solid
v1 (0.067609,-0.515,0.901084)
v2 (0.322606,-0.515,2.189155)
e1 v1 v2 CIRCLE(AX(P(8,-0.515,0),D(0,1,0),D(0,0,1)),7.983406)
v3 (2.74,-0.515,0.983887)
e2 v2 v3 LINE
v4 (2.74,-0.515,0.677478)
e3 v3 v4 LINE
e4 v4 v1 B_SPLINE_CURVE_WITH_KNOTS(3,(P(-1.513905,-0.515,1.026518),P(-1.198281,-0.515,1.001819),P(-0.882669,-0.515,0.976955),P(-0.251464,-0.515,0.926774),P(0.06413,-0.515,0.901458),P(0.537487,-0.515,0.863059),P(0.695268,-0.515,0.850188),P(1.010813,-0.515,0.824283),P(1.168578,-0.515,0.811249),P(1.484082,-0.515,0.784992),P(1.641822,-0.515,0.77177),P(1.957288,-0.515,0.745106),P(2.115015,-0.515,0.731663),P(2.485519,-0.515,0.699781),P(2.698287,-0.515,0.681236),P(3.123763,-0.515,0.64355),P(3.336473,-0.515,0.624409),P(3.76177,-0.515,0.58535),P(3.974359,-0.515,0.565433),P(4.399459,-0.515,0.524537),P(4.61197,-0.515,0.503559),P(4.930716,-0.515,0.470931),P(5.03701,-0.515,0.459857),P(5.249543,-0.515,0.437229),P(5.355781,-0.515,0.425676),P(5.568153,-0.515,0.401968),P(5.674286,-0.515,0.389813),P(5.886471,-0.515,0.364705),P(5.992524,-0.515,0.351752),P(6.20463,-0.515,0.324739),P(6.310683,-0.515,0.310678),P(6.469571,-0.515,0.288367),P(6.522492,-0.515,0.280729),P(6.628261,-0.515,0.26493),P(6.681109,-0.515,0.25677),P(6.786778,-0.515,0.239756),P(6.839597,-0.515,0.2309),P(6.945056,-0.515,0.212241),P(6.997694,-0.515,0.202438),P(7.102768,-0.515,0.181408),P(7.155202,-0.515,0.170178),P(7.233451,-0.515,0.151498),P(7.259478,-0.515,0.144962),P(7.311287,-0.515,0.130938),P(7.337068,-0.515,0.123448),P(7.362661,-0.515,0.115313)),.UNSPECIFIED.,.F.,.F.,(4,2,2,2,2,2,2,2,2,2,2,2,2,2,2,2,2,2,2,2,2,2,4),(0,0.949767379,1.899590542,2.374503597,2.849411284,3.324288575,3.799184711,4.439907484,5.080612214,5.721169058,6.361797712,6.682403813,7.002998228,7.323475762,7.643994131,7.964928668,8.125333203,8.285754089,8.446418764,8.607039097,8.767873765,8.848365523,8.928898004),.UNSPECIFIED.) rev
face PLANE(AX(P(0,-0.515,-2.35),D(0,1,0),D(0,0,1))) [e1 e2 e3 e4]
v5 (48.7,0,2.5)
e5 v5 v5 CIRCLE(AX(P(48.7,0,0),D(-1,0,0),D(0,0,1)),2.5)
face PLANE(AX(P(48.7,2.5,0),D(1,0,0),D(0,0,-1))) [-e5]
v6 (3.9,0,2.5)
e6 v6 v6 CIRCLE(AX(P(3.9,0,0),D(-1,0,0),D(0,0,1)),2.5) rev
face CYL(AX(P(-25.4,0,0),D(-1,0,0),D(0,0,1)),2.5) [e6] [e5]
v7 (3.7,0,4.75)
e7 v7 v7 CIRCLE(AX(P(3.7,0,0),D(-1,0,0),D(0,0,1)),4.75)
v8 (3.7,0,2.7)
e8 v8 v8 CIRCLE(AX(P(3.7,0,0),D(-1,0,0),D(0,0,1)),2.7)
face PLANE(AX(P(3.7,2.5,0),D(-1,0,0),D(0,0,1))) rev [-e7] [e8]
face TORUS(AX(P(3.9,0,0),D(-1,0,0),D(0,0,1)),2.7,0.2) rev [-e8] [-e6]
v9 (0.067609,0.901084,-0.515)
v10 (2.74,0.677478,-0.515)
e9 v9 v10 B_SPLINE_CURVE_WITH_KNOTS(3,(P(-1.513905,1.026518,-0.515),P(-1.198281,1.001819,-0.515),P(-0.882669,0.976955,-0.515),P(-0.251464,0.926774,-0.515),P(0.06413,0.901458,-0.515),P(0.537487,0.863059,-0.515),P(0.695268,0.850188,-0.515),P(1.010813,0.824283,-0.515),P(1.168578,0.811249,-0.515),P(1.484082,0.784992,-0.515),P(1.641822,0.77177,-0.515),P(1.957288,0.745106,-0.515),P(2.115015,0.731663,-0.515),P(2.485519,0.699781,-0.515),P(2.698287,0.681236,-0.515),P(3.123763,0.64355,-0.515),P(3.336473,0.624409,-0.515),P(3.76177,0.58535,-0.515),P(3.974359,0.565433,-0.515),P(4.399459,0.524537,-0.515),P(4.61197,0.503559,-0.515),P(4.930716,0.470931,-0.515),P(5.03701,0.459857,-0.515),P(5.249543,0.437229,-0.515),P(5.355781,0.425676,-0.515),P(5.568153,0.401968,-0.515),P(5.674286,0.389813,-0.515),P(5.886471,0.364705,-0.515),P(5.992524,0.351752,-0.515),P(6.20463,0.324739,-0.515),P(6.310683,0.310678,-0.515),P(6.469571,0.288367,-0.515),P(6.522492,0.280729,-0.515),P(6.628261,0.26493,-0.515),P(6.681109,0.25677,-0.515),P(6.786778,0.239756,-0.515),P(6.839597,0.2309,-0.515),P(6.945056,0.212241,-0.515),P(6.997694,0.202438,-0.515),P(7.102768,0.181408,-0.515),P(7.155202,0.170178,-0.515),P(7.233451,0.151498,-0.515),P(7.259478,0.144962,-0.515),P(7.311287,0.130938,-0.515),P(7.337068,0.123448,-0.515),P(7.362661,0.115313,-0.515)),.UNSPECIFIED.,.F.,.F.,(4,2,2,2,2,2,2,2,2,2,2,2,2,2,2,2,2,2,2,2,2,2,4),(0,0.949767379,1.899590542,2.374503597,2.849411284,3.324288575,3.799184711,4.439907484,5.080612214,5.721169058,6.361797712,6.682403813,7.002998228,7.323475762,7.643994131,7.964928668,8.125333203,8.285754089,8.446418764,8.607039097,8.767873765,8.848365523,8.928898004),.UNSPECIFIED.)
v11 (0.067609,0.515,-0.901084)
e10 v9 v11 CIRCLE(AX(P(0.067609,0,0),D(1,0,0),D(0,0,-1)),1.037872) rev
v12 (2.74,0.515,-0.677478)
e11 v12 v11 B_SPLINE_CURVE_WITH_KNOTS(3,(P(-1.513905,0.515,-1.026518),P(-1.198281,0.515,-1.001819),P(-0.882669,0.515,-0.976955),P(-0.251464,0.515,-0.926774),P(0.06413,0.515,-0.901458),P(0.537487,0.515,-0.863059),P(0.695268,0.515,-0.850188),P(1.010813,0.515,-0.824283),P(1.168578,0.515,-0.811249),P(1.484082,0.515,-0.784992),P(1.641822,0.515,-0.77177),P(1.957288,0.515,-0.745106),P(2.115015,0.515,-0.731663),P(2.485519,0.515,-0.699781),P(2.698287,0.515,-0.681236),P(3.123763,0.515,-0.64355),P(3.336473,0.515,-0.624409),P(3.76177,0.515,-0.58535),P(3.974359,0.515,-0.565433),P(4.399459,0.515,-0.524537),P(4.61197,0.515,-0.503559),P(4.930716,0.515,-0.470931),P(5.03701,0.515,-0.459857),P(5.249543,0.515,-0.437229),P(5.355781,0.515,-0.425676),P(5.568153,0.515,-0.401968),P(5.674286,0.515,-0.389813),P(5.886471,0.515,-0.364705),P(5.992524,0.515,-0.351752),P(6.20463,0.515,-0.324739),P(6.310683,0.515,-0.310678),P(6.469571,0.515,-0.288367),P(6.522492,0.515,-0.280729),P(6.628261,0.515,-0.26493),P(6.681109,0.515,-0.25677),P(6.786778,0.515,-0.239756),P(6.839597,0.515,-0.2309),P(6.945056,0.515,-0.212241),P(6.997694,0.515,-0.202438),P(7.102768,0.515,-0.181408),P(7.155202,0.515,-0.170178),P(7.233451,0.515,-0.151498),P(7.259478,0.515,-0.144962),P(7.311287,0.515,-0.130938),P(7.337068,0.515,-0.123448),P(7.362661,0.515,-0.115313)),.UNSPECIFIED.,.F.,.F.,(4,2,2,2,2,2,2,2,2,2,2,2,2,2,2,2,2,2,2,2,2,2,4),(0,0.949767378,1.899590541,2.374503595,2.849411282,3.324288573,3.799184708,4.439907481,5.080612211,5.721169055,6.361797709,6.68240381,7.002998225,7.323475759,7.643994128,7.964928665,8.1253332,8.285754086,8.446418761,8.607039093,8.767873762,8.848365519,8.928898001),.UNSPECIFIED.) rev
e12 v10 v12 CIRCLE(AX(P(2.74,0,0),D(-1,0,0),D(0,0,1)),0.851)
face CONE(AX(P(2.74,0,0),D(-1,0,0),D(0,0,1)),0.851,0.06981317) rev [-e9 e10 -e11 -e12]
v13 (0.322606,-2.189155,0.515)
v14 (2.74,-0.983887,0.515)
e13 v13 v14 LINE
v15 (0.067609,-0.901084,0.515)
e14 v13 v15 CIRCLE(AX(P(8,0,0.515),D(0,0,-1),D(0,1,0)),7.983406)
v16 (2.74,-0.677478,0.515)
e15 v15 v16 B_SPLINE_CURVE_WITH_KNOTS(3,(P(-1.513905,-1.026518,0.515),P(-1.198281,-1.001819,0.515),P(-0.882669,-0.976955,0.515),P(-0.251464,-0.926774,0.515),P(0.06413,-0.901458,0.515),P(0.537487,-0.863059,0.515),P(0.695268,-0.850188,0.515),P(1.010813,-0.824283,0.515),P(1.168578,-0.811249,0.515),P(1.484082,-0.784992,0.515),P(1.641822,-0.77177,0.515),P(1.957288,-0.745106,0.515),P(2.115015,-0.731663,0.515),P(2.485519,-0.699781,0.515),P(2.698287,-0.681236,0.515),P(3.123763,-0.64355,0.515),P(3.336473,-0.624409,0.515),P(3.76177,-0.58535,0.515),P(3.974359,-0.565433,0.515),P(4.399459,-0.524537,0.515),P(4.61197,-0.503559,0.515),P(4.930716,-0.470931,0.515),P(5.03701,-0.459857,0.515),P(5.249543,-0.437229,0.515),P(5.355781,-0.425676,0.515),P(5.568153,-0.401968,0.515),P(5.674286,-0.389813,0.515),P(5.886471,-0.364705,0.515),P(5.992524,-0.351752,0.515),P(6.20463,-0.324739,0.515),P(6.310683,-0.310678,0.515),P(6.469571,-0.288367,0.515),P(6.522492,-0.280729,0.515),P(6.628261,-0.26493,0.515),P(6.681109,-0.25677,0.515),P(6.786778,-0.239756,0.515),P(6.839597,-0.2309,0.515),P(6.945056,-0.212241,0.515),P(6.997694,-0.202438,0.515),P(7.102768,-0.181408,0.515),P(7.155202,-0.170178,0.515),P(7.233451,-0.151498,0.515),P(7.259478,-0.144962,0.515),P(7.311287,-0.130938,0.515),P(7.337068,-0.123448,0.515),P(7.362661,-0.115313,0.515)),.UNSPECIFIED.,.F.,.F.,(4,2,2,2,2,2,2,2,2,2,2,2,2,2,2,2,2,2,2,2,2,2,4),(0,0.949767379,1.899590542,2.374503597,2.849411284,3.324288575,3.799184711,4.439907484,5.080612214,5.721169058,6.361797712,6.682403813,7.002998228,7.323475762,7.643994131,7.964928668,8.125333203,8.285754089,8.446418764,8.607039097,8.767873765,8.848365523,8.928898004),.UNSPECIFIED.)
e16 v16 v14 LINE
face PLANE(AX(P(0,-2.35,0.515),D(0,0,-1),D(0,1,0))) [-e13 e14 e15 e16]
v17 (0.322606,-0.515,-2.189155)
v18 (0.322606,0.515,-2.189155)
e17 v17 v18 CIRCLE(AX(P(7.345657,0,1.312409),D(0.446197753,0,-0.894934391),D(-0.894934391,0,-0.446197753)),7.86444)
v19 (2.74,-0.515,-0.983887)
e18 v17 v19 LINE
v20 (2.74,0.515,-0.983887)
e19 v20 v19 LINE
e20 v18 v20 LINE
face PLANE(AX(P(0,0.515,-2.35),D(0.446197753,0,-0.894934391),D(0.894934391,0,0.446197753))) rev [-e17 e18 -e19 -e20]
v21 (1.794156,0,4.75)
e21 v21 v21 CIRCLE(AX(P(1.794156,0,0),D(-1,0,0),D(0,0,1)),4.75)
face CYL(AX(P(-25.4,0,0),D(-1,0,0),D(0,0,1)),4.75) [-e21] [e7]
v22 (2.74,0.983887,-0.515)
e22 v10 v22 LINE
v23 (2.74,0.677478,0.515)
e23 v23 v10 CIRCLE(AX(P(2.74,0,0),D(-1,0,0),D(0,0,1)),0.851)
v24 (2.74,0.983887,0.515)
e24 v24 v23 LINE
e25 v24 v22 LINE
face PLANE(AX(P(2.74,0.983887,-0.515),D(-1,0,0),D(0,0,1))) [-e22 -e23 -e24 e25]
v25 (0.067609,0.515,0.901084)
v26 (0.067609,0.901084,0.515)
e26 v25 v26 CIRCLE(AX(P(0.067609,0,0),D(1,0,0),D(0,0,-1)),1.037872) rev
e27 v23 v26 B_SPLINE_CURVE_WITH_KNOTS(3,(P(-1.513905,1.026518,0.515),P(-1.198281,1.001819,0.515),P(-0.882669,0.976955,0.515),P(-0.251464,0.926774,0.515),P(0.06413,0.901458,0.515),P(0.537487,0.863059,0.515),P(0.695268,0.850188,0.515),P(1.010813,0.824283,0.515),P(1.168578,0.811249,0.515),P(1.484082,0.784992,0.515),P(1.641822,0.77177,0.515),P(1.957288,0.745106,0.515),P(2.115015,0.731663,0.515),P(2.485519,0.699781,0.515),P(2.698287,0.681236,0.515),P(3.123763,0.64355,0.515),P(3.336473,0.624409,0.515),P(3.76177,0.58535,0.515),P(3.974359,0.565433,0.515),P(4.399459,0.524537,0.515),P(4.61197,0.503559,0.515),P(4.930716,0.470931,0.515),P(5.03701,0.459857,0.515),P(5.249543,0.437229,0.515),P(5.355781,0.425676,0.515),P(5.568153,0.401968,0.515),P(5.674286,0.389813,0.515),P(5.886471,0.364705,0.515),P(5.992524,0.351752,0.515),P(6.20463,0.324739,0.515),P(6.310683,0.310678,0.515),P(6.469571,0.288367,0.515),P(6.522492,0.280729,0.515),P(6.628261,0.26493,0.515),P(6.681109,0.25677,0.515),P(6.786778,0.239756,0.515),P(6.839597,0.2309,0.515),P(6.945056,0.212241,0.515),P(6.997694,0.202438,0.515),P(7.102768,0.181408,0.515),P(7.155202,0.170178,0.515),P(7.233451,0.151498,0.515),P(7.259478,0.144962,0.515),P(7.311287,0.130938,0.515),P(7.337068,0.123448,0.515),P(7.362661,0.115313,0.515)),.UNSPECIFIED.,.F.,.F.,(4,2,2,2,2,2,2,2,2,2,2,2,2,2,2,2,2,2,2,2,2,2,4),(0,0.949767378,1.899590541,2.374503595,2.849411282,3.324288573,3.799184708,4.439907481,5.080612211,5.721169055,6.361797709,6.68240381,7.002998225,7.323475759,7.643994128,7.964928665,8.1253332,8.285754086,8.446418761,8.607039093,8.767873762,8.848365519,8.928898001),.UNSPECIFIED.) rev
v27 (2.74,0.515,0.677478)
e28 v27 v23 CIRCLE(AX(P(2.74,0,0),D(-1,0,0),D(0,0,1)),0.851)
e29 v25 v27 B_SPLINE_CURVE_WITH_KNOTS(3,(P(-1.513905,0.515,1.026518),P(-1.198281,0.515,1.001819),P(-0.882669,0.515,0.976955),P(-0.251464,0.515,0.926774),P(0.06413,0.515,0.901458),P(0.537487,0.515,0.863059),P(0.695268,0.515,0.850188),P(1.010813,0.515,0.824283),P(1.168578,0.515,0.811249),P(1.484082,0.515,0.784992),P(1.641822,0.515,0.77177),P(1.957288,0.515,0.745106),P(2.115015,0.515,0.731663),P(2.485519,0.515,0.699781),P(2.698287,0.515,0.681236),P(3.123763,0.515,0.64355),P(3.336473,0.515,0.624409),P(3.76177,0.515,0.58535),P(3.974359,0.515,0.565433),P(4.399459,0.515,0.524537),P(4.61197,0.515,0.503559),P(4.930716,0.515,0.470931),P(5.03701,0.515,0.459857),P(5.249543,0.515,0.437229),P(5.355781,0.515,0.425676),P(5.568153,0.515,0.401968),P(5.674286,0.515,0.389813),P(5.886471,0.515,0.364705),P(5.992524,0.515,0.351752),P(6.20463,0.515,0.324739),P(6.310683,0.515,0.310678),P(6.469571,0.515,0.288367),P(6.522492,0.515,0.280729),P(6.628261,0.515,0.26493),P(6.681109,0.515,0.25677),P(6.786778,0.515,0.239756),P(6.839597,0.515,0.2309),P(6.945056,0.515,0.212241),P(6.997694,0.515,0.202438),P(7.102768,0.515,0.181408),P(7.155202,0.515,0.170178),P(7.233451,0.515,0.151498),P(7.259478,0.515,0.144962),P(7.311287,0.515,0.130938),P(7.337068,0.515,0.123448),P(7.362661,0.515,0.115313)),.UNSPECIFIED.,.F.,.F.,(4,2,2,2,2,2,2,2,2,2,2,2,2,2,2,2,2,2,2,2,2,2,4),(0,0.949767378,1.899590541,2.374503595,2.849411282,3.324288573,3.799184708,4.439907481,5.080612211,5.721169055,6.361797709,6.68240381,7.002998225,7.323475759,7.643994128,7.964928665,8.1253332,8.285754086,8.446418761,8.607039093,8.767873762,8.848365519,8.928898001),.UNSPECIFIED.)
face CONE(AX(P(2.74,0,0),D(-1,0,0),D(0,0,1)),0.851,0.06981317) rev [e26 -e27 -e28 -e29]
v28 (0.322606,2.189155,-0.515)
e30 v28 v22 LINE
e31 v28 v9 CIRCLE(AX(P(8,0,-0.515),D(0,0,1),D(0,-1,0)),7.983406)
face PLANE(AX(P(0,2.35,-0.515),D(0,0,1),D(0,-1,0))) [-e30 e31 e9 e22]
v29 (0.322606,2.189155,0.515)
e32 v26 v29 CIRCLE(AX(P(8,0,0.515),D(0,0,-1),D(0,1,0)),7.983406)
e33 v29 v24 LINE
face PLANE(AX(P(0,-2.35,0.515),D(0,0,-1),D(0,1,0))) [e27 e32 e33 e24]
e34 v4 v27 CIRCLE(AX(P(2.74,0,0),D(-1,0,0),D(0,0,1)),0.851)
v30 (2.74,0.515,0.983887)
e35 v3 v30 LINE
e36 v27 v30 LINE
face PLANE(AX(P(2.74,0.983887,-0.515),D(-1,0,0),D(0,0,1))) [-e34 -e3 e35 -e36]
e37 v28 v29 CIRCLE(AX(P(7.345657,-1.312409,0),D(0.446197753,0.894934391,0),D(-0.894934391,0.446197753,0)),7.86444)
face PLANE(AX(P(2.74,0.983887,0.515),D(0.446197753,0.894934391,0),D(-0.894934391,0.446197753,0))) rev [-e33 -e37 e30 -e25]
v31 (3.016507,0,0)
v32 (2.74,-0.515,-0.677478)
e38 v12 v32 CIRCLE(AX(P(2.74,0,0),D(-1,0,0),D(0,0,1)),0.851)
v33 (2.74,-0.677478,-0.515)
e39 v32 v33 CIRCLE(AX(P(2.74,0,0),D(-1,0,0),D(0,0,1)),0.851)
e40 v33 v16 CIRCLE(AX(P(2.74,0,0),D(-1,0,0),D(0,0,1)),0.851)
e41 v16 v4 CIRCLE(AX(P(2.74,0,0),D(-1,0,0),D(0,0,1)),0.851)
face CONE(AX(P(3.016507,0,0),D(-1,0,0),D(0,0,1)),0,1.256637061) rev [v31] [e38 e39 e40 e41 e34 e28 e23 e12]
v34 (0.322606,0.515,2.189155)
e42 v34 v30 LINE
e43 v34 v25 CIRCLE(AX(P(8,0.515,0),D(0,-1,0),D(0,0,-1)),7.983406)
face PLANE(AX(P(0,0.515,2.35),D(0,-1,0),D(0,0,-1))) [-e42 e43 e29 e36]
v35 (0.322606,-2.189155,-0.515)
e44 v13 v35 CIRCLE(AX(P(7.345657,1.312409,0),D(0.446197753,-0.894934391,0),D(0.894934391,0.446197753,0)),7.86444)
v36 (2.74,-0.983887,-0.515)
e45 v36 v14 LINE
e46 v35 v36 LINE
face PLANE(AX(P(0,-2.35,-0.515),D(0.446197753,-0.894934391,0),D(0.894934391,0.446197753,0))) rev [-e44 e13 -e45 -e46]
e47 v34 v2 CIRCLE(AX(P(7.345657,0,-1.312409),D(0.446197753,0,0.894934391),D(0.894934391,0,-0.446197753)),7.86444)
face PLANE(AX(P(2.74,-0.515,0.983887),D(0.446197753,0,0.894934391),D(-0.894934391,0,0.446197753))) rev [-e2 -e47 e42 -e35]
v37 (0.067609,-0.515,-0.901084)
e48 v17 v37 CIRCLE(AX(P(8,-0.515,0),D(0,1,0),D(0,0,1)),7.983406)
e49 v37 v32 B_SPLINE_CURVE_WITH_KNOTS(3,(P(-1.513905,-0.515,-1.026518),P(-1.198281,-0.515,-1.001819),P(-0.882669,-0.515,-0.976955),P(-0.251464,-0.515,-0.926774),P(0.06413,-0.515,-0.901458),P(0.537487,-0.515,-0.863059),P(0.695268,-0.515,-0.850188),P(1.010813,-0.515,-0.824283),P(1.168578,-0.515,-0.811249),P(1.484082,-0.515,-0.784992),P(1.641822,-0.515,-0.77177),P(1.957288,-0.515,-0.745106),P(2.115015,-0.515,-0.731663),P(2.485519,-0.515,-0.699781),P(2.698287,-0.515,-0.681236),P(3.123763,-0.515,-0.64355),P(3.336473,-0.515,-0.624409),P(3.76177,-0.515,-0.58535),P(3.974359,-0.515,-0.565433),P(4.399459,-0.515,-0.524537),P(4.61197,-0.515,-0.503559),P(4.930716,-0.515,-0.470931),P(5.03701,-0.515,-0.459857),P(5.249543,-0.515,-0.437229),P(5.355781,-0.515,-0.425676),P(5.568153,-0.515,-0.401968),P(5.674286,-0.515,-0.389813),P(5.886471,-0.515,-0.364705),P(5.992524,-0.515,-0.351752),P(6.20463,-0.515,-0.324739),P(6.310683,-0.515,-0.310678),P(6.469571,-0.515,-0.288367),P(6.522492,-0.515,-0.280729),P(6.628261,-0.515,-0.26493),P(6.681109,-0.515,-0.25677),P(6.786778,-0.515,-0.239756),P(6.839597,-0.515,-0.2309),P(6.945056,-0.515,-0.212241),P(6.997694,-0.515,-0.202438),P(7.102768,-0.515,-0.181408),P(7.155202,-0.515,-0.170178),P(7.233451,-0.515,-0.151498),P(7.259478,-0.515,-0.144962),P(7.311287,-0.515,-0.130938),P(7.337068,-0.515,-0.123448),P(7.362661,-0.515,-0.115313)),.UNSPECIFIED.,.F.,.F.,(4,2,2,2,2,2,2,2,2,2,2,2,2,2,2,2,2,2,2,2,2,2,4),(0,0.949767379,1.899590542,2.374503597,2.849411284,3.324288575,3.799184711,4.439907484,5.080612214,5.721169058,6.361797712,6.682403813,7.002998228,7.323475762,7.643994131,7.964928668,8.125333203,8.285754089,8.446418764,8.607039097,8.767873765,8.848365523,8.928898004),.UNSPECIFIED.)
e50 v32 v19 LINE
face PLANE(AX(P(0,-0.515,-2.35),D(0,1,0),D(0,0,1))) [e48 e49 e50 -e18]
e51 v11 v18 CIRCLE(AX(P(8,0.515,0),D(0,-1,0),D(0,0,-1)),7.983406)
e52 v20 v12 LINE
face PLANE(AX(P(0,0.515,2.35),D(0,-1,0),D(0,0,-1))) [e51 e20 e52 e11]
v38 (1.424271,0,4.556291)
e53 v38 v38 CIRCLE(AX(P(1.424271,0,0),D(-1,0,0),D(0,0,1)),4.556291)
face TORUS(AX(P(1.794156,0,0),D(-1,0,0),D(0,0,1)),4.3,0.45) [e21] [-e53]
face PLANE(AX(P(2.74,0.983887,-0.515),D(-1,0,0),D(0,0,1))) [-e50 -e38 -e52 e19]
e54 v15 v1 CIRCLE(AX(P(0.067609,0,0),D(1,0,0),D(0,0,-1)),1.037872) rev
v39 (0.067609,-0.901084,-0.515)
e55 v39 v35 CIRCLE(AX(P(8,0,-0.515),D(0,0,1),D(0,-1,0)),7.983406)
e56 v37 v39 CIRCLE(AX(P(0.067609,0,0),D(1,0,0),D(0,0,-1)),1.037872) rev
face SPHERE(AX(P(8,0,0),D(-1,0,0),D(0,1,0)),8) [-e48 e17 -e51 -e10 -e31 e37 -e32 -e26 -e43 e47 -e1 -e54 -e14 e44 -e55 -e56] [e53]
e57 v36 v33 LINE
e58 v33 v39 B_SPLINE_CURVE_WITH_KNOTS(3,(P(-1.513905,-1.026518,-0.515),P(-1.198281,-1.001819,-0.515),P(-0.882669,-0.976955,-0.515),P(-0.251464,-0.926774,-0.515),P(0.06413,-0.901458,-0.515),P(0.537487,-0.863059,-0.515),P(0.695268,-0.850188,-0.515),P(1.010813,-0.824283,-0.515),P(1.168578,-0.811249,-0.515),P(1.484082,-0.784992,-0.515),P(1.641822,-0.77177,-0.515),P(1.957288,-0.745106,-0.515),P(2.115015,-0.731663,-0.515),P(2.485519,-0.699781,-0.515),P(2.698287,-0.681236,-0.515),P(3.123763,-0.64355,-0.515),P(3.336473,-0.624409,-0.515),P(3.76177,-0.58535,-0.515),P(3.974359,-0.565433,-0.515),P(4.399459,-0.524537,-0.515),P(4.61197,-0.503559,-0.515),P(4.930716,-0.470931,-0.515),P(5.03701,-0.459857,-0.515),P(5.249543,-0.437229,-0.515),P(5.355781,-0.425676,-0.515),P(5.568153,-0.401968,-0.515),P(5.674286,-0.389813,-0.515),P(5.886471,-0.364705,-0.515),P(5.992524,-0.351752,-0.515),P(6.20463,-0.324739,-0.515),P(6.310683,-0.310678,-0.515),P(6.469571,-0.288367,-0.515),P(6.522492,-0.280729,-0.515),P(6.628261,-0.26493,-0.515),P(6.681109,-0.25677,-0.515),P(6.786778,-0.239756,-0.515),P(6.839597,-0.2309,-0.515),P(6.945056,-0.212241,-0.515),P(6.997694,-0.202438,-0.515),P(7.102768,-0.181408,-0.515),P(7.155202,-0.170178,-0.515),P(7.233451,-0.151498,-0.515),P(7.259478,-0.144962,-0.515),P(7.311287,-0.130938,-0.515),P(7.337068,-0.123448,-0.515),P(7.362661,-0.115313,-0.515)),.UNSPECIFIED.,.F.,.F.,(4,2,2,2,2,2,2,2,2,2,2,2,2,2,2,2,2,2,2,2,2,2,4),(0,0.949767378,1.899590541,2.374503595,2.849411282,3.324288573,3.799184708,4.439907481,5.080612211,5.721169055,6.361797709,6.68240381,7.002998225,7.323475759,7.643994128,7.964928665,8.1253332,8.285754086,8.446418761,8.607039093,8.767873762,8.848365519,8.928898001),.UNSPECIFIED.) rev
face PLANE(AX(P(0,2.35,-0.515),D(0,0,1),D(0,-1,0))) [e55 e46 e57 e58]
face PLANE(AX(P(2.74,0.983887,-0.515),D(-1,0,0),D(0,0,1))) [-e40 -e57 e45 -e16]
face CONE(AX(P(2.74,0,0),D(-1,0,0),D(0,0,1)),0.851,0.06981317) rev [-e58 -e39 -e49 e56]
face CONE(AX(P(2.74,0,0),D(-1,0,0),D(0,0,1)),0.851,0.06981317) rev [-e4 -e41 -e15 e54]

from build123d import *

# Parameters (mm, degrees)
RECPAT_COUNT = 2
RECPAT_ANGLE = 90


with BuildPart() as part:
    # Fillet1: read off the stored shape, not the designer's step
    # Fillet1 outline → Fillet1 (revolve)
    with BuildSketch(Plane.YX):
        with BuildLine():
            Line((2.5, 3.9), (2.5, 48.7))
            Line((2.5, 48.7), (0, 48.7))
            Line((0, 48.7), (0, 0))
            ThreePointArc((0, 0), (2.386856711, 0.364365446), (4.556291394, 1.42427124))
            ThreePointArc((4.556291394, 1.42427124), (4.698642149, 1.58538712), (4.75, 1.79415598))
            Line((4.75, 1.79415598), (4.75, 3.7))
            Line((4.75, 3.7), (2.7, 3.7))
            ThreePointArc((2.7, 3.7), (2.558578644, 3.758578644), (2.5, 3.9))
        make_face()
    revolve(axis=Axis((0, 0, 0), (1, 0, 0)))

    # Sketch3 → Recess section 0
    with BuildSketch(Plane(origin=(0, 0, 0), x_dir=(0, 0, -1), z_dir=(1, 0, 0))):
        with BuildLine():
            Line((0.515, -2.35), (-0.515, -2.35))
            Line((-0.515, -2.35), (-0.515, 2.35))
            Line((-0.515, 2.35), (0.515, 2.35))
            Line((0.515, 2.35), (0.515, -2.35))
        make_face()
    # Sketch4 → Recess section 1
    with BuildSketch(Plane(origin=(2.74, 0, 0), x_dir=(0, 0, -1), z_dir=(1, 0, 0))):
        with BuildLine():
            Line((0.515, -0.983886622), (-0.515, -0.983886622))
            Line((-0.515, -0.983886622), (-0.515, 0.983886622))
            Line((-0.515, 0.983886622), (0.515, 0.983886622))
            Line((0.515, 0.983886622), (0.515, -0.983886622))
        make_face()
    recess = loft(mode=Mode.SUBTRACT)

    # RecPat: Recess ×2 about axis
    recpat_axis = Axis((0, 0, 0), (1, 0, 0))
    for i in range(1, RECPAT_COUNT):
        add(recess.rotate(recpat_axis, i * RECPAT_ANGLE / (RECPAT_COUNT - 1)), mode=Mode.SUBTRACT)

    # RecCorSke → RecessCore (revolve, cut)
    with BuildSketch(Plane.XY, mode=Mode.PRIVATE) as recesscore_sk:
        Polygon((0, 0), (0, 1.042599465), (2.74, 0.851), (3.016506661, 0), align=None)
    revolve(recesscore_sk.sketch.rotate(Axis((-3.175, 0, 0), (1, 0, 0)), 90), axis=Axis((-3.175, 0, 0), (1, 0, 0)), mode=Mode.SUBTRACT)


solid = part.part
